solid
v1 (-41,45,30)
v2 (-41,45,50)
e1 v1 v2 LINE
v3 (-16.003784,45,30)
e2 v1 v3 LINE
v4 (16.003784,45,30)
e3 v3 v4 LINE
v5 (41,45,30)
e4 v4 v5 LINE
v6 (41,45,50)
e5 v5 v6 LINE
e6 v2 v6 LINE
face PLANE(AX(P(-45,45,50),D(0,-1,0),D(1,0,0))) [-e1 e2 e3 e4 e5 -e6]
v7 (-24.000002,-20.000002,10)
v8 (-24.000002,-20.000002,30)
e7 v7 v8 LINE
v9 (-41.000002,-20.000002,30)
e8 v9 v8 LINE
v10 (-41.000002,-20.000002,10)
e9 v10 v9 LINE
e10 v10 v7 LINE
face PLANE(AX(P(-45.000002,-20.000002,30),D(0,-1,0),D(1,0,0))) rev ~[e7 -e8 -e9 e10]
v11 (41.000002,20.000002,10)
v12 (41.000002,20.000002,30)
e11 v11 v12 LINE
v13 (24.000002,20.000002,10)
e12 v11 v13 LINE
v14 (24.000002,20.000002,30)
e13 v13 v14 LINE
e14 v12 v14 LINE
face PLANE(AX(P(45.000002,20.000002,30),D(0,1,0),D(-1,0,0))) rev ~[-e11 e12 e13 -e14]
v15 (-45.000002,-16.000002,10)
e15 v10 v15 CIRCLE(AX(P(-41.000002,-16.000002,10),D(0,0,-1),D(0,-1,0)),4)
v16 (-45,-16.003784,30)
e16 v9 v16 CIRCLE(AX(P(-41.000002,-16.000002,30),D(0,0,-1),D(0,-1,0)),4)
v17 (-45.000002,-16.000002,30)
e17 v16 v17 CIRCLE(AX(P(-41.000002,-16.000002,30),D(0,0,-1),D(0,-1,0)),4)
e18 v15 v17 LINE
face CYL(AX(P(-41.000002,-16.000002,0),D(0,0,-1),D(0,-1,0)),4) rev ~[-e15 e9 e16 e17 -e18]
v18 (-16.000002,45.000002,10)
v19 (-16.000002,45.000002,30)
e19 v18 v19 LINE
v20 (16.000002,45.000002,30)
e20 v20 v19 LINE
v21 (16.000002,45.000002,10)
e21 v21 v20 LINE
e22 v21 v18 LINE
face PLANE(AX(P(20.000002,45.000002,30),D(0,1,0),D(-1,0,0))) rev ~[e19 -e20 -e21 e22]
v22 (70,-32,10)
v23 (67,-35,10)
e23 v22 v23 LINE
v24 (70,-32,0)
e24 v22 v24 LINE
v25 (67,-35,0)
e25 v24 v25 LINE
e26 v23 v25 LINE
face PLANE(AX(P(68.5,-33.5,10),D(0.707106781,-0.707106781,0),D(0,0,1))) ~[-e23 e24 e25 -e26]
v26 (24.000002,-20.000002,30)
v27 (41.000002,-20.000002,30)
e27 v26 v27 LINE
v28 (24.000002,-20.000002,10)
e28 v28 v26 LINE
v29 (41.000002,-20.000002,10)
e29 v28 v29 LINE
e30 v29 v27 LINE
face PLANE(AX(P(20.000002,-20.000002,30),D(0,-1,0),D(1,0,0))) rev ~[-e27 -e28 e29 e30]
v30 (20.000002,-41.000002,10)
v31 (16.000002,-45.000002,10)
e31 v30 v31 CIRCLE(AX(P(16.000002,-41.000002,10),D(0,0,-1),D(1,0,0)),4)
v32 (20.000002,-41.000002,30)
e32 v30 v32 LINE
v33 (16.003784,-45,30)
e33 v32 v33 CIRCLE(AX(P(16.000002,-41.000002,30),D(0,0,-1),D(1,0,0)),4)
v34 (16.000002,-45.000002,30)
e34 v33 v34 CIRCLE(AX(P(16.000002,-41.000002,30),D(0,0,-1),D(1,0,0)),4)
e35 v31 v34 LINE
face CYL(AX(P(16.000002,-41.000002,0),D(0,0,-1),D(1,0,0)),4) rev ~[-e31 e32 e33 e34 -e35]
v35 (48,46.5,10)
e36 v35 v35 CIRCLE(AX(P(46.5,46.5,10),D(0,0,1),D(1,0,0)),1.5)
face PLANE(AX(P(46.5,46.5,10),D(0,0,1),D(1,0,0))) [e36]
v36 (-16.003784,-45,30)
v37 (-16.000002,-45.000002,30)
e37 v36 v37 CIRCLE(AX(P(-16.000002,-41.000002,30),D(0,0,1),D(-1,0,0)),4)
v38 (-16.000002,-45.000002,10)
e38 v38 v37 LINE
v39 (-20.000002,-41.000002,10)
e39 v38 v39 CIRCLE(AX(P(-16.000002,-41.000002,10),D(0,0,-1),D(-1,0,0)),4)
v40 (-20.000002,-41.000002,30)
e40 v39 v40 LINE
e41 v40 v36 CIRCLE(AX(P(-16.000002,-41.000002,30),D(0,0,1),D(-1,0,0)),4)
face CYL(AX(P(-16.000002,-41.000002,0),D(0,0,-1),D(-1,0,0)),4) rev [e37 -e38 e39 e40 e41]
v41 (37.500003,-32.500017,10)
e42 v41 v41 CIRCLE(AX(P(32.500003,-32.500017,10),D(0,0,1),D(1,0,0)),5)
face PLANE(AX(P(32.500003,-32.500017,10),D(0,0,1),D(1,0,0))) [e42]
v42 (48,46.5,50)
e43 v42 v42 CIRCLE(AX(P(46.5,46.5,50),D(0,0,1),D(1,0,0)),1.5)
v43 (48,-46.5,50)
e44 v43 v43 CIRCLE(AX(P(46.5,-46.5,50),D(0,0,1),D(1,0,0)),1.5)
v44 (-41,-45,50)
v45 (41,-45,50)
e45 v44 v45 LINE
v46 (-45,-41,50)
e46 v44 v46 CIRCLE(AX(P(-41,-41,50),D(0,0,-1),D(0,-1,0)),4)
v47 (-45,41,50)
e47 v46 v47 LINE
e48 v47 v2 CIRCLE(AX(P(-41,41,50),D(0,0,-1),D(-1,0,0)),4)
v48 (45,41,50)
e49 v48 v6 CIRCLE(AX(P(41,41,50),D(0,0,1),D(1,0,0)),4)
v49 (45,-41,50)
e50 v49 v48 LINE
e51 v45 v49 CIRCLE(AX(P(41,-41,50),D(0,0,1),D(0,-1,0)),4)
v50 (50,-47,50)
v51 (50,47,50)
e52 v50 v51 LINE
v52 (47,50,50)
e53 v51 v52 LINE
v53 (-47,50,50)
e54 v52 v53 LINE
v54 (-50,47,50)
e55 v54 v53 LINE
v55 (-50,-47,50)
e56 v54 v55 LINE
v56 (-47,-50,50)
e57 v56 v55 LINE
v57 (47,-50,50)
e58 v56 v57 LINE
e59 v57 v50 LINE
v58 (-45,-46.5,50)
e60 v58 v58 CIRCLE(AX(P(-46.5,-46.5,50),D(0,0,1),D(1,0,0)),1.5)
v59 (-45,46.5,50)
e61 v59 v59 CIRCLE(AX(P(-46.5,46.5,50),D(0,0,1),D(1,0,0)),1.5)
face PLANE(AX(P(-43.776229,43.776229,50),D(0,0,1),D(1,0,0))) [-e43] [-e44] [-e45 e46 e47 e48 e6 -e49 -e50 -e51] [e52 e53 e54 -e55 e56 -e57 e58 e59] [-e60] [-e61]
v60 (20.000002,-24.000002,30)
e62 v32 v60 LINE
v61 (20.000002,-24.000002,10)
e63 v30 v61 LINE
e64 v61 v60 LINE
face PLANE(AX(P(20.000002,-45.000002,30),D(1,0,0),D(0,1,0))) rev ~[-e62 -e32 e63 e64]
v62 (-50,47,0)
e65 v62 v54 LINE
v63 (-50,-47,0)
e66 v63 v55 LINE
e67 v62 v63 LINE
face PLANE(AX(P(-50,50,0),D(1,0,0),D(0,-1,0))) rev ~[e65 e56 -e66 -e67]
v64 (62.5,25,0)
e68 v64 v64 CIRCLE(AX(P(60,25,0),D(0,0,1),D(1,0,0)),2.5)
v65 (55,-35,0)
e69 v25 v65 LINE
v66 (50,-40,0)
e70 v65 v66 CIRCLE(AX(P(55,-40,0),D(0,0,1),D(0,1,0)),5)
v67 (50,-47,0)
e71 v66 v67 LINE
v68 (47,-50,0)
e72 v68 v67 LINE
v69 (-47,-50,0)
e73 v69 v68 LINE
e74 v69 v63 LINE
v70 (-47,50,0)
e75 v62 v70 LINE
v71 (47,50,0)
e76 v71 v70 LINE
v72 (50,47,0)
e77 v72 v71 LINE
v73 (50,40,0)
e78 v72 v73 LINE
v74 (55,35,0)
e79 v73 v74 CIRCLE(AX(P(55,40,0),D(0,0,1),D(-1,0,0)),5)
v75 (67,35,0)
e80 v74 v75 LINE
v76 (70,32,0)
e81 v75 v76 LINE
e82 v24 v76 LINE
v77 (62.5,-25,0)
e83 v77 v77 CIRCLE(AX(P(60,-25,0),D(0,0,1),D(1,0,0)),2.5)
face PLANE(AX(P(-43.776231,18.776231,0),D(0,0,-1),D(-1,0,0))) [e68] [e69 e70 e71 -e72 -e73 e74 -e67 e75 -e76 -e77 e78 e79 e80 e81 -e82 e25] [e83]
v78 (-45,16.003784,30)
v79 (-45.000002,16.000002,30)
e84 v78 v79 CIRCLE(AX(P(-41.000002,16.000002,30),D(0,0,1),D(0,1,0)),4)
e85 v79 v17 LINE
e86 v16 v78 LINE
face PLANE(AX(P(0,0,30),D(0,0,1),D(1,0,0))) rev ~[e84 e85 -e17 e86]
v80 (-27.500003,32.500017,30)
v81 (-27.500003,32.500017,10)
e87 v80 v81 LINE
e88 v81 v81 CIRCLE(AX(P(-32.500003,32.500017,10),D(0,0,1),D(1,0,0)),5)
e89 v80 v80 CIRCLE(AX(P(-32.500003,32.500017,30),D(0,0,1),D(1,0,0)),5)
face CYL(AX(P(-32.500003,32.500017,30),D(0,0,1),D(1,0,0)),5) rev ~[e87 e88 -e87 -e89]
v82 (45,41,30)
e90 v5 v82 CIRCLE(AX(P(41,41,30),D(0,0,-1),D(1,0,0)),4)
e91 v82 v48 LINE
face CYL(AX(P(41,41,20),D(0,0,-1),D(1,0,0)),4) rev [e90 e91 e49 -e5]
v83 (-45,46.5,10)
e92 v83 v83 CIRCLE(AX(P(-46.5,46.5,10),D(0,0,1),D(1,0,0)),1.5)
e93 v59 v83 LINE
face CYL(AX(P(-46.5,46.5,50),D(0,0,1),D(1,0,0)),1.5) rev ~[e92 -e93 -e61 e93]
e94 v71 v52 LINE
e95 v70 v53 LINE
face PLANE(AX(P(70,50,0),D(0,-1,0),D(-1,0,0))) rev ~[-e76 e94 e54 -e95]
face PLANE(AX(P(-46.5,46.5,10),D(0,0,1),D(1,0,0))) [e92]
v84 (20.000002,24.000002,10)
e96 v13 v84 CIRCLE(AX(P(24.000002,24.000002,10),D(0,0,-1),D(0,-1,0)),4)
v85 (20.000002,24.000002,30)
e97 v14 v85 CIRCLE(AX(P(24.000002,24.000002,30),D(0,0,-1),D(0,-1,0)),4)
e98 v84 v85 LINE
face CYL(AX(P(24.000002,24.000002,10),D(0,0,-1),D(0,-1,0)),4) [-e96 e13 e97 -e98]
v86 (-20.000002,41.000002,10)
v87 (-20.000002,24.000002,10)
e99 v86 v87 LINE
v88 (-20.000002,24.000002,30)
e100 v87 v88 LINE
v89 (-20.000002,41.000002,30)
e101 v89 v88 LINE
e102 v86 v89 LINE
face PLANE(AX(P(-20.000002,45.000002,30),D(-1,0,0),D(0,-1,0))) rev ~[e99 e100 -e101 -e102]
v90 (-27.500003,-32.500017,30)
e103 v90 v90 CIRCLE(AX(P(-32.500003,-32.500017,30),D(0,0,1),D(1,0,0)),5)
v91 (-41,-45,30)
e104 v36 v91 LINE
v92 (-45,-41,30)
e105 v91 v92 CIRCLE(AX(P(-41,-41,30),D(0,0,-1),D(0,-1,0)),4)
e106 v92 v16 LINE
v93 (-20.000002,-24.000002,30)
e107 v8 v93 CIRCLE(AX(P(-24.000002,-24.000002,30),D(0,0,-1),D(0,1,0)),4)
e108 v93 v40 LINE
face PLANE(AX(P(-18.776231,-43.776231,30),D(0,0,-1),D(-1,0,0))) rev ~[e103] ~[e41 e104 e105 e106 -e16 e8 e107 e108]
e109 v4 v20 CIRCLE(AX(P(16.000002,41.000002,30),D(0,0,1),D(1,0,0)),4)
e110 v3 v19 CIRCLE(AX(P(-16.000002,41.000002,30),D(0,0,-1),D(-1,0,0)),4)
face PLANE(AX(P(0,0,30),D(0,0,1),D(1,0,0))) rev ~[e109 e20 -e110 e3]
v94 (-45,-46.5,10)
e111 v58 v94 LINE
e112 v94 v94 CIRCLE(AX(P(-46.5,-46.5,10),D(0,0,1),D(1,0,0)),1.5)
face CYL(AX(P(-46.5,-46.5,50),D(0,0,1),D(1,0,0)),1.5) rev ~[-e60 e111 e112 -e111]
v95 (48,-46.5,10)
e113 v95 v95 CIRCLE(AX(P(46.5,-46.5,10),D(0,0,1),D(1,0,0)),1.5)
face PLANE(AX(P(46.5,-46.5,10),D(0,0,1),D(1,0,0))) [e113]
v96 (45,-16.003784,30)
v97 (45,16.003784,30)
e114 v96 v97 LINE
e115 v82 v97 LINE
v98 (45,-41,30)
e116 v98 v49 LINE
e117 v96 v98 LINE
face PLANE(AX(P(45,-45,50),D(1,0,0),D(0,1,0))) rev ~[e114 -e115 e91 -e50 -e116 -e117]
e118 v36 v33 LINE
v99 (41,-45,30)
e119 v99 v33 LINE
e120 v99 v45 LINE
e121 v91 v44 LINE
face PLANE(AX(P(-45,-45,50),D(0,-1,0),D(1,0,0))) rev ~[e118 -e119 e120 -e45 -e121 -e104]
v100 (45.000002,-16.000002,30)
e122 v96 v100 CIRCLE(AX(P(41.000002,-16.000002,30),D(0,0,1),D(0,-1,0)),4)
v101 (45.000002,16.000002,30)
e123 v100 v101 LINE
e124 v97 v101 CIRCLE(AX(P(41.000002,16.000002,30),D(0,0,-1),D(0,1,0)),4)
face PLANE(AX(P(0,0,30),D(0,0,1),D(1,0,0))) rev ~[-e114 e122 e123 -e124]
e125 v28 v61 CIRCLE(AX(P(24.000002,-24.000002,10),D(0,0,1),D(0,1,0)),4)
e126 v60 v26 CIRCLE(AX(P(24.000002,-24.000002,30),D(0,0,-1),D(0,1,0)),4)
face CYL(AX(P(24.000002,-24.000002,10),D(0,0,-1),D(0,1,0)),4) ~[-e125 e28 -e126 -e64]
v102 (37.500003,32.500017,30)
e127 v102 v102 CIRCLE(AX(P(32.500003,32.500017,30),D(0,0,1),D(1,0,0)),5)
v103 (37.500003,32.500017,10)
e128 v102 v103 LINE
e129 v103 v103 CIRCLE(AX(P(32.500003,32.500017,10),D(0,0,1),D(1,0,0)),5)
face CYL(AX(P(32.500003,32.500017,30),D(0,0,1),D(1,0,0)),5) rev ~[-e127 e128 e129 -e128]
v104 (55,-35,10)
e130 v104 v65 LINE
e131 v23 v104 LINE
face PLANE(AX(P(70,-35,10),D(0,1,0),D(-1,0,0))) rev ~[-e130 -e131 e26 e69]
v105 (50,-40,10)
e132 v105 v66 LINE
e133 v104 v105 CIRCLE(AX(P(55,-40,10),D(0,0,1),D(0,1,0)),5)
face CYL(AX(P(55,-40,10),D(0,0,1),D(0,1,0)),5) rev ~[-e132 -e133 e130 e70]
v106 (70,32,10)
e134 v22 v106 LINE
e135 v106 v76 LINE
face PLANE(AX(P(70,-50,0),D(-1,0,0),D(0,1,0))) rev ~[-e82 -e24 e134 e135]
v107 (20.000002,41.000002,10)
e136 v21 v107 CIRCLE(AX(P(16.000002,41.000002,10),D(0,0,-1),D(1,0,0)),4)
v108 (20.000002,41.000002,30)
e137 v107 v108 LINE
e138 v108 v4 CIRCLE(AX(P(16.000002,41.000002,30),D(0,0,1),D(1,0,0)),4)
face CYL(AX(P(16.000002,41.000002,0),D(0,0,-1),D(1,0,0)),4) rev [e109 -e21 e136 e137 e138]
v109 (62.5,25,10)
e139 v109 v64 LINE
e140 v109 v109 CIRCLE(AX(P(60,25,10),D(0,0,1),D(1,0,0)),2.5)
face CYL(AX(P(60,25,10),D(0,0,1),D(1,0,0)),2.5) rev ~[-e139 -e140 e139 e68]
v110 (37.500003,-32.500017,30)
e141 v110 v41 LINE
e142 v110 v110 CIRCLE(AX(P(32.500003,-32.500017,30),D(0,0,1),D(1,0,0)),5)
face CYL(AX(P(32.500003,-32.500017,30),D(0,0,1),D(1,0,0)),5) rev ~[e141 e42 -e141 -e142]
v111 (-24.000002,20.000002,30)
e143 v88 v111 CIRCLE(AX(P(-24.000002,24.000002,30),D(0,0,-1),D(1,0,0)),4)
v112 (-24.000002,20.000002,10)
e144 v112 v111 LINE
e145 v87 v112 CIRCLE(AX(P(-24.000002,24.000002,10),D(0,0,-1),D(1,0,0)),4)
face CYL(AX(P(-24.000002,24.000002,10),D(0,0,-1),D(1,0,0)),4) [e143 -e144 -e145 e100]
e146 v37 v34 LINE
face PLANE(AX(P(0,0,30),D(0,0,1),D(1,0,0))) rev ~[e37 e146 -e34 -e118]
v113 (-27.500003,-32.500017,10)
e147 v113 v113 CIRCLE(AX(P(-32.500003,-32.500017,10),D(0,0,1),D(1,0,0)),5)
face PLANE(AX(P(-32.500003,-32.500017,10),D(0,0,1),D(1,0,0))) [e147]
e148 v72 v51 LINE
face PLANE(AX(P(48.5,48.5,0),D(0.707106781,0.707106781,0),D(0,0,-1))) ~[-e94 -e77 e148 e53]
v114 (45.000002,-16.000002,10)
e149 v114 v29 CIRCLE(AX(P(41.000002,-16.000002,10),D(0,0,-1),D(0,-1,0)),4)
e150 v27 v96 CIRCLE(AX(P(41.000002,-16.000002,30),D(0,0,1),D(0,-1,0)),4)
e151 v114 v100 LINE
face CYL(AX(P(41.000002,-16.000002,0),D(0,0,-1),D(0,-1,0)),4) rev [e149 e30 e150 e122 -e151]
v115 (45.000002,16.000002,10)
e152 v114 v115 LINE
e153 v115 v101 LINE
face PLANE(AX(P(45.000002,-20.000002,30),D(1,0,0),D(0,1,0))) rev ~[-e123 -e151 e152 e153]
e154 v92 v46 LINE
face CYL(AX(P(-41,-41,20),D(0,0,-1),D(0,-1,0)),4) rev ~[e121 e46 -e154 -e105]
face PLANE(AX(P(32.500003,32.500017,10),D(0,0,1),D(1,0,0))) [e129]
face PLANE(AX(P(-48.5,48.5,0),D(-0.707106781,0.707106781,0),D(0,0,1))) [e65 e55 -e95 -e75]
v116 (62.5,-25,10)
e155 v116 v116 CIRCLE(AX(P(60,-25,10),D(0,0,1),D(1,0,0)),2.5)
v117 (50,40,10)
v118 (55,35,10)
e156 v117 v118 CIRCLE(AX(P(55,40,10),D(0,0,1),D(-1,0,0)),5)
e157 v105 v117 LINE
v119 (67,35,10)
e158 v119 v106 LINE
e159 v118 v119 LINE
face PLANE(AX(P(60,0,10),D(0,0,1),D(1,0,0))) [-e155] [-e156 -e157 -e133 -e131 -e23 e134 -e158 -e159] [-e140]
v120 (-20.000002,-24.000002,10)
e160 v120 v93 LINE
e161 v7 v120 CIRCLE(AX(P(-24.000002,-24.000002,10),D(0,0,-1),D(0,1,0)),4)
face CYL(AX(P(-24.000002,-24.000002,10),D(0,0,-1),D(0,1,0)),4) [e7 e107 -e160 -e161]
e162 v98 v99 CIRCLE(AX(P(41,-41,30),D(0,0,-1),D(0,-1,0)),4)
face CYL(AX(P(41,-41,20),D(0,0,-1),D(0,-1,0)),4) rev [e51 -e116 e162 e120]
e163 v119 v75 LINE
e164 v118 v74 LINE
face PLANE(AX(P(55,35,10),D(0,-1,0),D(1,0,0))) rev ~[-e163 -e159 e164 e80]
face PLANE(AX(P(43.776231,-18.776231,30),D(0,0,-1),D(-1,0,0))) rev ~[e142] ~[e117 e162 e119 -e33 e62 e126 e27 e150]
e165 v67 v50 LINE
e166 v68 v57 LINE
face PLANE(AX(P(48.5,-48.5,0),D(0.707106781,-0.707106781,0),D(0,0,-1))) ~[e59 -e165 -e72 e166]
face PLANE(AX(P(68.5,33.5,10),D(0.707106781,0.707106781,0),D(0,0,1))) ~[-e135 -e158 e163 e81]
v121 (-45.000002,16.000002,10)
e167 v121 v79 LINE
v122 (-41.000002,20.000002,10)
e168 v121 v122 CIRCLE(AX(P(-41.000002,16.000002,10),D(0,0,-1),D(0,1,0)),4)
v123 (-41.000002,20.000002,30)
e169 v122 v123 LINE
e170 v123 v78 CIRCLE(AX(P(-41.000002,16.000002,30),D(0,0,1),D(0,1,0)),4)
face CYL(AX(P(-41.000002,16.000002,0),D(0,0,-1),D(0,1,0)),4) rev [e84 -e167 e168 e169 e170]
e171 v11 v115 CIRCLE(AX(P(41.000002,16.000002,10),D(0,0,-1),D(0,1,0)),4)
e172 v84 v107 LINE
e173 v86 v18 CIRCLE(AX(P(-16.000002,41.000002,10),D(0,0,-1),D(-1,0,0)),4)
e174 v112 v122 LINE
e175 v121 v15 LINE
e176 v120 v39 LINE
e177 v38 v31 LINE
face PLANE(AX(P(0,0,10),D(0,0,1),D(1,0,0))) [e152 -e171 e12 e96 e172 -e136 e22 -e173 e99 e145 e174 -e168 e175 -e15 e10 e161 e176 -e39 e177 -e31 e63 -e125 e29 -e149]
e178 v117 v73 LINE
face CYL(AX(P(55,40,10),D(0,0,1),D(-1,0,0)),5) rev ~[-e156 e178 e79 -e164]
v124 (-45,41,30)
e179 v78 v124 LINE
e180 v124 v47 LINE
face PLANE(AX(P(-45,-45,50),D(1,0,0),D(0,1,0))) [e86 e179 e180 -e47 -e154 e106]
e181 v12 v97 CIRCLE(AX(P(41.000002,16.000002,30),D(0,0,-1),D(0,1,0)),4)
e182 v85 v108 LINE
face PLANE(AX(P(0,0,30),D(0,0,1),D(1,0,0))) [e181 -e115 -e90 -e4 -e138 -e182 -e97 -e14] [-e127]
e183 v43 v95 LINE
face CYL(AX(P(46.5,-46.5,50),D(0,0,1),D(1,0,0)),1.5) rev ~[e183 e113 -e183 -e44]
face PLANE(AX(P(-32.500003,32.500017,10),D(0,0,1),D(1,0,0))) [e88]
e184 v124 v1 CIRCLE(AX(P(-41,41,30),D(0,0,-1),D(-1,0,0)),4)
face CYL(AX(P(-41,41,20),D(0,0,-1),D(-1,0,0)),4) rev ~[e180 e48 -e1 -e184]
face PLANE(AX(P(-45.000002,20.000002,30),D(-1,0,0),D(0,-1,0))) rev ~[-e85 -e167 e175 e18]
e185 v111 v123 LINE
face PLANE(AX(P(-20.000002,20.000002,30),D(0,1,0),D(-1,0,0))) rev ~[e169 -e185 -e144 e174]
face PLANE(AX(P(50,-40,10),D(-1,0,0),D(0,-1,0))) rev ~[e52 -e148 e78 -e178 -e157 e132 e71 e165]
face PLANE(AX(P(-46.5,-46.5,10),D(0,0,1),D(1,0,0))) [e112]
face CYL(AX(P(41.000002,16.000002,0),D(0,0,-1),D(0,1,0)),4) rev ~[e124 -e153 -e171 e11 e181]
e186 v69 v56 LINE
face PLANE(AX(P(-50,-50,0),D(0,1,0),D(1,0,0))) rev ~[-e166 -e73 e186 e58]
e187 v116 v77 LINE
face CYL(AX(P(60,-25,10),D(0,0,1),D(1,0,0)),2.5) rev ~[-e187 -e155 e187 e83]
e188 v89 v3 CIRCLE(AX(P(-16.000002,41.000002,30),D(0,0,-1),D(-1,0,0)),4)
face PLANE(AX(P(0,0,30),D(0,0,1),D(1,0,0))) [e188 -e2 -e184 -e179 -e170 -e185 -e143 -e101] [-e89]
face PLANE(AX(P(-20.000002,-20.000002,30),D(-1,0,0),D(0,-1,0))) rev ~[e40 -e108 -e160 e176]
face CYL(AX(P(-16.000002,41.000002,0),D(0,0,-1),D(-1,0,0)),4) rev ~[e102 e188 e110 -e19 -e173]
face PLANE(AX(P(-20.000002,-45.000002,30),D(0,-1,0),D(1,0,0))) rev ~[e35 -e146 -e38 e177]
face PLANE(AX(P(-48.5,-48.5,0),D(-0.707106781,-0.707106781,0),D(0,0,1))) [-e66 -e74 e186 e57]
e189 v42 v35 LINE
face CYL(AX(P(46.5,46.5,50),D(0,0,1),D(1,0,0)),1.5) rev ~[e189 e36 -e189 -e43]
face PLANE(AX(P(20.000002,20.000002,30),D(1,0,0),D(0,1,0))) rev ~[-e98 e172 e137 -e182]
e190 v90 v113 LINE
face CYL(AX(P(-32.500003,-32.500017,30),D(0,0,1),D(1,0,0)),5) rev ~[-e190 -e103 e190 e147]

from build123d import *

# Parameters (mm, degrees)
F1_DEPTH     = 50
F2_W         = 20
F2_H         = 100
F3_DEPTH     = 40
F4_R         = 2.5
F5_DEPTH     = 10
F6_W         = 90
F6_H         = 90
F7_DEPTH     = 20
F8_R         = 5
F9_DEPTH     = 20
F10_R        = 1.5
F11_DEPTH    = 40
F12_SIZE     = 3
F13_T1_DEPTH = 30
F13_T3_DEPTH = 30
F13_T5_DEPTH = 30


# Not quite as in the source:
# - a fillet or chamfer that OpenCascade refuses, or shapes differently, is made with other operations: its cross-section is extruded or revolved along the edge and cut away or added


with BuildPart() as f1:
    # F0 (on Top) → F1 (new body)
    with BuildSketch(Plane.XY):
        Polygon((-50, -50), (50, -50), (70, -50), (70, 50), (50, 50), (-50, 50), align=None)
    extrude(amount=F1_DEPTH)

    # F2 (on face) → F3 (cut)
    with BuildSketch(Plane.XY.offset(50)):
        with Locations((60, 0)):
            Rectangle(F2_W, F2_H)
    extrude(amount=-F3_DEPTH, mode=Mode.SUBTRACT)

    # F4 (on face) → F5 (cut, through all)
    with BuildSketch(Plane.XY.offset(10)):
        with BuildLine():
            Line((50, -40), (50, -50))
            Line((50, -50), (70, -50))
            Line((70, -50), (70, -35))
            Line((70, -35), (55, -35))
            ThreePointArc((55, -35), (51.4644660941, -36.4644660941), (50, -40))
        make_face()
        with Locations((60, -25)):
            Circle(F4_R)
        with Locations((60, 25)):
            Circle(F4_R)
        with BuildLine():
            ThreePointArc((50, 40), (51.4644660941, 36.4644660941), (55, 35))
            Line((55, 35), (70, 35))
            Line((70, 35), (70, 50))
            Line((70, 50), (50, 50))
            Line((50, 50), (50, 40))
        make_face()
    extrude(amount=-F5_DEPTH, mode=Mode.SUBTRACT)

    # F6 (on face) → F7 (cut)
    with BuildSketch(Plane.XY.offset(50)):
        Rectangle(F6_W, F6_H)
    extrude(amount=-F7_DEPTH, mode=Mode.SUBTRACT)

    # F8 (on face) → F9 (cut)
    with BuildSketch(Plane.XY.offset(30)):
        with Locations((-32.5000025332, 32.5000174344)):
            Circle(F8_R)
        Polygon((-45.0000017881, 20.0000017881), (-45.0000017881, -20.0000017881), (-20.0000017881, -20.0000017881), (-20.0000017881, -45.0000017881), (20.0000017881, -45.0000017881), (20.0000017881, -20.0000017881), (45.0000017881, -20.0000017881), (45.0000017881, 20.0000017881), (20.0000017881, 20.0000017881), (20.0000017881, 45.0000017881), (-20.0000017881, 45.0000017881), (-20.0000017881, 20.0000017881), align=None)
        with Locations((-32.5000025332, -32.5000174344)):
            Circle(F8_R)
        with Locations((32.5000025332, 32.5000174344)):
            Circle(F8_R)
        with Locations((32.5000025332, -32.5000174344)):
            Circle(F8_R)
    extrude(amount=-F9_DEPTH, mode=Mode.SUBTRACT)

    # F10 (on face) → F11 (cut)
    with BuildSketch(Plane.XY.offset(50)):
        with Locations((-46.5, 46.5)):
            Circle(F10_R)
        with Locations((-46.5, -46.5)):
            Circle(F10_R)
        with Locations((46.5, 46.5)):
            Circle(F10_R)
        with Locations((46.5, -46.5)):
            Circle(F10_R)
    extrude(amount=-F11_DEPTH, mode=Mode.SUBTRACT)

    # F12
    f12_edges = [f1.edges().sort_by_distance(p)[0] for p in [
        (70, -35, 5),
        (70, 35, 5),
        (50, -50, 25),
        (-50, -50, 25),
        (50, 50, 25),
        (-50, 50, 25),
    ]]
    chamfer(f12_edges, length=F12_SIZE)

    # F13: fillet of radius 4 on 16 edges, made by hand

    # F13_s2 → F13_t1 (join)
    with BuildSketch(Plane.XY.offset(20)):
        with BuildLine():
            ThreePointArc((-45, 41), (-43.8284271247, 43.8284271247), (-41, 45))
            Line((-41, 45), (-45, 45))
            Line((-45, 45), (-45, 41))
        make_face()
        with BuildLine():
            ThreePointArc((45, 41), (43.8284271247, 43.8284271247), (41, 45))
            Line((41, 45), (45, 45))
            Line((45, 45), (45, 41))
        make_face()
        with BuildLine():
            ThreePointArc((41, -45), (43.8284271247, -43.8284271247), (45, -41))
            Line((45, -41), (45, -45))
            Line((45, -45), (41, -45))
        make_face()
        with BuildLine():
            ThreePointArc((-41, -45), (-43.8284271247, -43.8284271247), (-45, -41))
            Line((-45, -41), (-45, -45))
            Line((-45, -45), (-41, -45))
        make_face()
    extrude(amount=F13_T1_DEPTH)

    # F13_s4 → F13_t3 (join)
    with BuildSketch(Plane.XY):
        with BuildLine():
            ThreePointArc((-41.0000017881, 20.0000017881), (-43.8284289129, 18.8284289129), (-45.0000017881, 16.0000017881))
            Line((-45.0000017881, 16.0000017881), (-45.0000017881, 20.0000017881))
            Line((-45.0000017881, 20.0000017881), (-41.0000017881, 20.0000017881))
        make_face()
        with BuildLine():
            ThreePointArc((-20.0000017881, 41.0000017881), (-18.8284289129, 43.8284289129), (-16.0000017881, 45.0000017881))
            Line((-16.0000017881, 45.0000017881), (-20.0000017881, 45.0000017881))
            Line((-20.0000017881, 45.0000017881), (-20.0000017881, 41.0000017881))
        make_face()
        with BuildLine():
            ThreePointArc((20.0000017881, 41.0000017881), (18.8284289129, 43.8284289129), (16.0000017881, 45.0000017881))
            Line((16.0000017881, 45.0000017881), (20.0000017881, 45.0000017881))
            Line((20.0000017881, 45.0000017881), (20.0000017881, 41.0000017881))
        make_face()
        with BuildLine():
            ThreePointArc((41.0000017881, 20.0000017881), (43.8284289129, 18.8284289129), (45.0000017881, 16.0000017881))
            Line((45.0000017881, 16.0000017881), (45.0000017881, 20.0000017881))
            Line((45.0000017881, 20.0000017881), (41.0000017881, 20.0000017881))
        make_face()
        with BuildLine():
            ThreePointArc((-41.0000017881, -20.0000017881), (-43.8284289129, -18.8284289129), (-45.0000017881, -16.0000017881))
            Line((-45.0000017881, -16.0000017881), (-45.0000017881, -20.0000017881))
            Line((-45.0000017881, -20.0000017881), (-41.0000017881, -20.0000017881))
        make_face()
        with BuildLine():
            ThreePointArc((-20.0000017881, -41.0000017881), (-18.8284289129, -43.8284289129), (-16.0000017881, -45.0000017881))
            Line((-16.0000017881, -45.0000017881), (-20.0000017881, -45.0000017881))
            Line((-20.0000017881, -45.0000017881), (-20.0000017881, -41.0000017881))
        make_face()
        with BuildLine():
            ThreePointArc((20.0000017881, -41.0000017881), (18.8284289129, -43.8284289129), (16.0000017881, -45.0000017881))
            Line((16.0000017881, -45.0000017881), (20.0000017881, -45.0000017881))
            Line((20.0000017881, -45.0000017881), (20.0000017881, -41.0000017881))
        make_face()
        with BuildLine():
            ThreePointArc((41.0000017881, -20.0000017881), (43.8284289129, -18.8284289129), (45.0000017881, -16.0000017881))
            Line((45.0000017881, -16.0000017881), (45.0000017881, -20.0000017881))
            Line((45.0000017881, -20.0000017881), (41.0000017881, -20.0000017881))
        make_face()
    extrude(amount=F13_T3_DEPTH)

    # F13_s6 → F13_t5 (cut)
    with BuildSketch(Plane.XY.offset(10)):
        with BuildLine():
            ThreePointArc((-20.0000017881, 24.0000017881), (-21.1715746634, 21.1715746634), (-24.0000017881, 20.0000017881))
            Line((-24.0000017881, 20.0000017881), (-20.0000017881, 20.0000017881))
            Line((-20.0000017881, 20.0000017881), (-20.0000017881, 24.0000017881))
        make_face()
        with BuildLine():
            ThreePointArc((24.0000017881, 20.0000017881), (21.1715746634, 21.1715746634), (20.0000017881, 24.0000017881))
            Line((20.0000017881, 24.0000017881), (20.0000017881, 20.0000017881))
            Line((20.0000017881, 20.0000017881), (24.0000017881, 20.0000017881))
        make_face()
        with BuildLine():
            ThreePointArc((-24.0000017881, -20.0000017881), (-21.1715746634, -21.1715746634), (-20.0000017881, -24.0000017881))
            Line((-20.0000017881, -24.0000017881), (-20.0000017881, -20.0000017881))
            Line((-20.0000017881, -20.0000017881), (-24.0000017881, -20.0000017881))
        make_face()
        with BuildLine():
            ThreePointArc((24.0000017881, -20.0000017881), (21.1715746634, -21.1715746634), (20.0000017881, -24.0000017881))
            Line((20.0000017881, -24.0000017881), (20.0000017881, -20.0000017881))
            Line((20.0000017881, -20.0000017881), (24.0000017881, -20.0000017881))
        make_face()
    extrude(amount=F13_T5_DEPTH, mode=Mode.SUBTRACT)


solid = f1.part
